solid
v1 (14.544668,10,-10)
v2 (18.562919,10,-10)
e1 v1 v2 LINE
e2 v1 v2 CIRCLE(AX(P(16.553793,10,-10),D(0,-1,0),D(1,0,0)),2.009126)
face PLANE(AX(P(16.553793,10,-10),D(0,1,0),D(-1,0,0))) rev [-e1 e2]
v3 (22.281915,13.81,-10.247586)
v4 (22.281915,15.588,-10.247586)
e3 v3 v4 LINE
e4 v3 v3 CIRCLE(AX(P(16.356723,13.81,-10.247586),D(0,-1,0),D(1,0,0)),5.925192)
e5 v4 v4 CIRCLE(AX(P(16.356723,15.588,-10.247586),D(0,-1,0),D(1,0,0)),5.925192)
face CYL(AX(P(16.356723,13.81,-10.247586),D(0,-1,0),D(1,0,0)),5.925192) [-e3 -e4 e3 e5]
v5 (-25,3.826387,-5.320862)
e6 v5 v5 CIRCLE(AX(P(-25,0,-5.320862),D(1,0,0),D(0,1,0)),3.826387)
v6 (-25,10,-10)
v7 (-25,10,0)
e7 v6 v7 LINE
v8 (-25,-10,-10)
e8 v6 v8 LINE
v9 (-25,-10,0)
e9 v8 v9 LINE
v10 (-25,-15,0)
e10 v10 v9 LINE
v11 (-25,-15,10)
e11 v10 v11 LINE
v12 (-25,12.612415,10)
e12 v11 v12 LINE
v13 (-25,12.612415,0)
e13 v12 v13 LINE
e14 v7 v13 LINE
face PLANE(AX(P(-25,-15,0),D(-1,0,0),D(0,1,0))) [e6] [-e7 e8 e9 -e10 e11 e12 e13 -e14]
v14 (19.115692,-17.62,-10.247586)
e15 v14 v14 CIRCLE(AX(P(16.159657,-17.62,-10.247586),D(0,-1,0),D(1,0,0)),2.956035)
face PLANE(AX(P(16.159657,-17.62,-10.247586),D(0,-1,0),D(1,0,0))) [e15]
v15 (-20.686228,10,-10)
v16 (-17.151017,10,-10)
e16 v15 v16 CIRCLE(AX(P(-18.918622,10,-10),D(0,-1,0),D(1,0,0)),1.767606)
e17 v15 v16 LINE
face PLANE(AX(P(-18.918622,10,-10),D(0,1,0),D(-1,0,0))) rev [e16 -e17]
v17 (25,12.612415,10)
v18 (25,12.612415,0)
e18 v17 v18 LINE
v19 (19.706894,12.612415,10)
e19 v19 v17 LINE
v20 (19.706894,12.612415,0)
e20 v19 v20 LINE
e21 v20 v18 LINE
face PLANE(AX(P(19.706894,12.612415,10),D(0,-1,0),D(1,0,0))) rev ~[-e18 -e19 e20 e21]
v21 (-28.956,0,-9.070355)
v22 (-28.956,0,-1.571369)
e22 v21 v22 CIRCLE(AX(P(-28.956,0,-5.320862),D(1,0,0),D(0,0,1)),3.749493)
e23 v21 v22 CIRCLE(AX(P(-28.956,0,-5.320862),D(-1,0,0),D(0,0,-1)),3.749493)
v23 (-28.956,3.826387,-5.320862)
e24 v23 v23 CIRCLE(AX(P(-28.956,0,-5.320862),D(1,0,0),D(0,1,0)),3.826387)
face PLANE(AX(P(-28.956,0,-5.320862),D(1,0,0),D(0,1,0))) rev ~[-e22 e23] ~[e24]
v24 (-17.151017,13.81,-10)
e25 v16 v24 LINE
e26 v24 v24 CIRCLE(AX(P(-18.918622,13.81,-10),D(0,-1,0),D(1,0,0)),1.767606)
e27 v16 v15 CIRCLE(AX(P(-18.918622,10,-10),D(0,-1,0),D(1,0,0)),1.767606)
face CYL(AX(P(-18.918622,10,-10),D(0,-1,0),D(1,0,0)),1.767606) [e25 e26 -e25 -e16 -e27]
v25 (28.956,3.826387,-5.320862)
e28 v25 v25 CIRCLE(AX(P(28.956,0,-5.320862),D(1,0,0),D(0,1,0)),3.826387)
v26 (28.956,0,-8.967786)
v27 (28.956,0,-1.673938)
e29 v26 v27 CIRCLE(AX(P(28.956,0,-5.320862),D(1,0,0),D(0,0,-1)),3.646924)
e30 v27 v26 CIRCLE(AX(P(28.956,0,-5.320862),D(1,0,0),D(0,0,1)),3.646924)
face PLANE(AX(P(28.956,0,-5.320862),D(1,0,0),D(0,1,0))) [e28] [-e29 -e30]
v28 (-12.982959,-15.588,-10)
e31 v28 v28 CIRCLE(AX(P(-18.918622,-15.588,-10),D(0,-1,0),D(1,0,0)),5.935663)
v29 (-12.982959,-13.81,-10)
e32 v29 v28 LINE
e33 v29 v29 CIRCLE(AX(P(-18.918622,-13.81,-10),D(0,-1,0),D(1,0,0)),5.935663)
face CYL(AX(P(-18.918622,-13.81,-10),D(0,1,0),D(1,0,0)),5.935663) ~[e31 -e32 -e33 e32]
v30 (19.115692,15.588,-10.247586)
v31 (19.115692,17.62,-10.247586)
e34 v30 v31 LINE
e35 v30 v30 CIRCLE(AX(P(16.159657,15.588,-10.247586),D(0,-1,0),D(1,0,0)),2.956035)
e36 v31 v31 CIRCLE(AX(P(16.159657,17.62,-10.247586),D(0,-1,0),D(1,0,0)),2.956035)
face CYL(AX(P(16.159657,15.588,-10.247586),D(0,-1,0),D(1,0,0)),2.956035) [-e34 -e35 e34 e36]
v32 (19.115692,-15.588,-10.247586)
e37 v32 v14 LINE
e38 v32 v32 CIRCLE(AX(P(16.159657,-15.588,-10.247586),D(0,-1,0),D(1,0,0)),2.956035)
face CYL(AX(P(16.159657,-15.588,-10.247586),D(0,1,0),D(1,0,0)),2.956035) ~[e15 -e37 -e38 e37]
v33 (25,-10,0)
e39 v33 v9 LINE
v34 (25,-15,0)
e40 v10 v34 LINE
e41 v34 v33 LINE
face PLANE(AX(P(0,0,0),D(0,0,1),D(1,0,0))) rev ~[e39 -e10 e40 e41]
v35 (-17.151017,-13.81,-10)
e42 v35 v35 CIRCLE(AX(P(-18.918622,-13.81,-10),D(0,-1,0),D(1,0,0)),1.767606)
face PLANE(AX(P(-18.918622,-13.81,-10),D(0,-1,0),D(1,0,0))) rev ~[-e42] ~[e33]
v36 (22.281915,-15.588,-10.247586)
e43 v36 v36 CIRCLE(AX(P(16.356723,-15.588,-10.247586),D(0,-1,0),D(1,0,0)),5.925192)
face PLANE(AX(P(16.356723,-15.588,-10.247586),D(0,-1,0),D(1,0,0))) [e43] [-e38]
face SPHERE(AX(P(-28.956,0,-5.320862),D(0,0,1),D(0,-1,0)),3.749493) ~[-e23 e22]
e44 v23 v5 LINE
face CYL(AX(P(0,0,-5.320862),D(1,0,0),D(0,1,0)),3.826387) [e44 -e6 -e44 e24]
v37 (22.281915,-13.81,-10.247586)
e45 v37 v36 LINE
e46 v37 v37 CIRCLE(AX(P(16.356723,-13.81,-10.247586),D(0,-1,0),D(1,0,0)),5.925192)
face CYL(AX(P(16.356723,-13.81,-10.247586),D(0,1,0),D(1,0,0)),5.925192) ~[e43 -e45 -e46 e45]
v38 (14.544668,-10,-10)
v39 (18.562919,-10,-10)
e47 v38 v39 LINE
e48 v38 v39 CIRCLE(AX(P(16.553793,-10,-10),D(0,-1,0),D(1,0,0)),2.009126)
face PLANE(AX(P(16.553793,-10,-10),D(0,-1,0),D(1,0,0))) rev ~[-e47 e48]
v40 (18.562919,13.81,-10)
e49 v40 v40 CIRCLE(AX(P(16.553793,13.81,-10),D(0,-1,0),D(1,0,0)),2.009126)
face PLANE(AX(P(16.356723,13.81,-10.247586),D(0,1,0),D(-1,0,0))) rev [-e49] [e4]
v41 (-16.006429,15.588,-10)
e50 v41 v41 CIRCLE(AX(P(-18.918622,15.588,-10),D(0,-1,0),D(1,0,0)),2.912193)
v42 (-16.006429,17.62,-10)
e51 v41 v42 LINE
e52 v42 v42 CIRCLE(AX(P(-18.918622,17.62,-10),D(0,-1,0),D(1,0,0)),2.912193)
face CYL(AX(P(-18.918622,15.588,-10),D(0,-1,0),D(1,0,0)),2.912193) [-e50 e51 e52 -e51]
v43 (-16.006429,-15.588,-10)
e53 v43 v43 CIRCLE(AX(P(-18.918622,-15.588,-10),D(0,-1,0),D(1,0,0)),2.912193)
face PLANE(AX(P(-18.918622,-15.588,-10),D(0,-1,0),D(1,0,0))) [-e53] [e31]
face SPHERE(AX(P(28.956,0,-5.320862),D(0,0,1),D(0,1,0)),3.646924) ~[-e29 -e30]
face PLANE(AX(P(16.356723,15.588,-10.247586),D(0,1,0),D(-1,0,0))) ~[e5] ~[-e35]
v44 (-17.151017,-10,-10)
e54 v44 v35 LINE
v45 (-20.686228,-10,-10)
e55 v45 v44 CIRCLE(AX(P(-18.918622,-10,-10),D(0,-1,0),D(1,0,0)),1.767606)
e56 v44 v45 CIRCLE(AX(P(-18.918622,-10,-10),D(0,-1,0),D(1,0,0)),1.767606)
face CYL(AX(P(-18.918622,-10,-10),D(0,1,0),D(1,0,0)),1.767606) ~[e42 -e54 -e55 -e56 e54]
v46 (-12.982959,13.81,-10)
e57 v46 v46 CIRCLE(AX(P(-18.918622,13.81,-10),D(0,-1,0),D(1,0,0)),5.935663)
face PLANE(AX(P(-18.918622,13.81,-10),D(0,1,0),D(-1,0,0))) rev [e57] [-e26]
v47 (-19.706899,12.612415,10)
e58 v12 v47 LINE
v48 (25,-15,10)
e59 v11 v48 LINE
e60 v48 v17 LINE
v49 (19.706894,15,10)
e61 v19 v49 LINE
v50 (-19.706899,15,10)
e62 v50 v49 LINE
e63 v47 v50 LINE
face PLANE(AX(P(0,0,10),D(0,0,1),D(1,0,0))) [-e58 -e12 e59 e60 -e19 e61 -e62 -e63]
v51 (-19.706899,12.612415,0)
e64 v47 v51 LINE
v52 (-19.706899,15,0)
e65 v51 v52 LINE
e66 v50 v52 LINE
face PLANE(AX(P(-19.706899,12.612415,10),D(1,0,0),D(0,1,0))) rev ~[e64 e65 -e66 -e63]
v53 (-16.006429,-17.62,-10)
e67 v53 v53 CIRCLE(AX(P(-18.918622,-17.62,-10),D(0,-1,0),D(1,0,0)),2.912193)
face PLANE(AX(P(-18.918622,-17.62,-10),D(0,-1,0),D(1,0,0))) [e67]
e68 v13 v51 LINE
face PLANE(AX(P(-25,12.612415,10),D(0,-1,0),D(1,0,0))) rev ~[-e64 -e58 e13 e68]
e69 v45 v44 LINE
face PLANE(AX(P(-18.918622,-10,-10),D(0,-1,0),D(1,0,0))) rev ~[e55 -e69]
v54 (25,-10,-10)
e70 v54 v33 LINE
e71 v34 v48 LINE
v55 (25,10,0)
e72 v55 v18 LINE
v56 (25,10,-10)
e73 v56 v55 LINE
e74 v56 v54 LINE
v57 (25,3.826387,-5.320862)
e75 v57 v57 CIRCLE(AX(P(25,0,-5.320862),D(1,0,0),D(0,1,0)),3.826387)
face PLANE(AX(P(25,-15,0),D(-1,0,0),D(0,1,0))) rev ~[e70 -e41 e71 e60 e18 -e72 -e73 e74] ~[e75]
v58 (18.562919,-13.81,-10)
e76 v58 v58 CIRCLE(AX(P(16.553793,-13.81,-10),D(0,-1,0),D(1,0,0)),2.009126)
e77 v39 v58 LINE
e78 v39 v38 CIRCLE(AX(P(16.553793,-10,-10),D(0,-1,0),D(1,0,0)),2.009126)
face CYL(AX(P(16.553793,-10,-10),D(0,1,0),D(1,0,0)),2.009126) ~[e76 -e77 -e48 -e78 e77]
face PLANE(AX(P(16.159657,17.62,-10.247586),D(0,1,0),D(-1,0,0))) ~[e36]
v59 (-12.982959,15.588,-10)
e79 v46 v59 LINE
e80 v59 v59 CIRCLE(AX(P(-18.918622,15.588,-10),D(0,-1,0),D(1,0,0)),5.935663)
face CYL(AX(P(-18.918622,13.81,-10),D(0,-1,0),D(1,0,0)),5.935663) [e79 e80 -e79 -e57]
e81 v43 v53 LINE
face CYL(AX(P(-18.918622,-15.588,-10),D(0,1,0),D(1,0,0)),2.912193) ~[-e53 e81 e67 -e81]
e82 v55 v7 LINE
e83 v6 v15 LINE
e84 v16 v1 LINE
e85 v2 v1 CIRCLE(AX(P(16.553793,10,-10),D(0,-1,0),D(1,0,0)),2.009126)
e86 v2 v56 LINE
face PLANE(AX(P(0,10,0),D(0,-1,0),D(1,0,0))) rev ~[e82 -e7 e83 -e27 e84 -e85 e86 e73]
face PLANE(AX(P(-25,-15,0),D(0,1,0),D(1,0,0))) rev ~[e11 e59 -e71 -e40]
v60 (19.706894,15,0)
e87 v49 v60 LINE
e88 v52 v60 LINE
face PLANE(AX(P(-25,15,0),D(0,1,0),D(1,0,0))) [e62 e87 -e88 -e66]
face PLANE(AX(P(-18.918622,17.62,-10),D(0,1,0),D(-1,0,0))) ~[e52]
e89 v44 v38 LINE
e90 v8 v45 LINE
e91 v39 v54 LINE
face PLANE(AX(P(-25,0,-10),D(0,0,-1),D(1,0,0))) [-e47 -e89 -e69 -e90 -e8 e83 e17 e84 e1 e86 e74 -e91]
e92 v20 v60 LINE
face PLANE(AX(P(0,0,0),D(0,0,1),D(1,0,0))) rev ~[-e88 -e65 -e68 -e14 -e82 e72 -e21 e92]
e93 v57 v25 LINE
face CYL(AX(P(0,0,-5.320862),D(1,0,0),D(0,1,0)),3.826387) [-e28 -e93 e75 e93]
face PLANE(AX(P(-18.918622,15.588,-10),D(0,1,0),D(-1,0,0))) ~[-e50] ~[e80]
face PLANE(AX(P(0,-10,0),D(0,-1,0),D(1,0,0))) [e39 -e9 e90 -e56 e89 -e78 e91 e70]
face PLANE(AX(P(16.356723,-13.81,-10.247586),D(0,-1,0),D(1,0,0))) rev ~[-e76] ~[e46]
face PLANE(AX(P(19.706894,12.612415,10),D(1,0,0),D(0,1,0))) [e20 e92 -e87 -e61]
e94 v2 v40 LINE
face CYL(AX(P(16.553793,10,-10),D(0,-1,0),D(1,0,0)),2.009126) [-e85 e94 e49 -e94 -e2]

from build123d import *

# Parameters (mm, degrees)
F0_W      = 50
F0_H      = 20
F1_DEPTH  = 10
F2_W      = 50
F2_H      = 30
F3_DEPTH  = 10
F4_R      = 3.8263869055
F5_DEPTH  = 28.956
F10_W     = 5.2931006998
F10_H     = 2.3875854537
F10_W_2   = 5.2931062877
F11_DEPTH = 20.001
F12_R     = 1.7676057038
F12_R_2   = 2.0091255021
F13_DEPTH = 3.81
F14_R     = 5.9356630849
F14_R_2   = 5.9251919842
F15_DEPTH = 1.778
F16_R     = 2.9121930079
F16_R_2   = 2.9560346156
F17_DEPTH = 2.032


# Not quite as in the source:
# - a pattern or mirror of a feature is missing from the dataset's text; its kind, count and spacing are read off the source's solid


with BuildPart() as f1:
    # F0 (on Front) → F1 (new body, symmetric)
    with BuildSketch(Plane.XZ):
        Rectangle(F0_W, F0_H)
    extrude(amount=F1_DEPTH, both=True)

    # F2 (on Top) → F3 (join)
    with BuildSketch(Plane.XY):
        Rectangle(F2_W, F2_H)
    extrude(amount=F3_DEPTH)

    # F4 (on Right) → F5 (join, symmetric)
    with BuildSketch(Plane.YZ):
        with Locations((0, -5.3208619356)):
            Circle(F4_R)
    extrude(amount=F5_DEPTH, both=True)

    # F6 (on face) → F7 (revolve)
    with BuildSketch(Plane(origin=(-28.956, 0, 0), x_dir=(0, -1, 0), z_dir=(-1, 0, 0))):
        with BuildLine():
            Line((0, -1.5713692232), (0, -9.0703546481))
            ThreePointArc((0, -9.0703546481), (3.7494927125, -5.3208619356), (0, -1.5713692232))
        make_face()
    revolve(axis=Axis((-28.956, 0, -5.2824148391), (0, 0, -1)))

    # F8 (on face) → F9 (revolve)
    with BuildSketch(Plane.YZ.offset(28.956)):
        with BuildLine():
            Line((0, -1.6739376972), (0, -8.967786174))
            ThreePointArc((0, -8.967786174), (3.6469242384, -5.3208619356), (0, -1.6739376972))
        make_face()
    revolve(axis=Axis((28.956, 0, -5.3208619356), (0, 0, -1)))

    # F10 (on face) → F11 (cut, through all)
    with BuildSketch(Plane.XY.offset(10)):
        with Locations((-22.3534496501, 13.8062072732)):
            Rectangle(F10_W, F10_H)
        with Locations((22.3534468561, 13.8062072732)):
            Rectangle(F10_W_2, F10_H)
    extrude(amount=-F11_DEPTH, mode=Mode.SUBTRACT)

    # F12 (on face) → F13 (join)
    with BuildSketch(Plane.XZ.offset(10)):
        with Locations((-18.9186222851, -10)):
            Circle(F12_R)
        with Locations((16.5537931025, -10)):
            Circle(F12_R_2)
    f13 = extrude(amount=F13_DEPTH)

    # F13_copies: F13 across plane
    add(f13.mirror(Plane.ZX))

    # F14 (on face) → F15 (join)
    with BuildSketch(Plane.XZ.offset(13.81)):
        with Locations((-18.9186222851, -10)):
            Circle(F14_R)
        with Locations((16.3567233831, -10.247586295)):
            Circle(F14_R_2)
    f15 = extrude(amount=F15_DEPTH)

    # F15_copies: F15 across plane
    add(f15.mirror(Plane.ZX))

    # F16 (on face) → F17 (join)
    with BuildSketch(Plane.XZ.offset(15.588)):
        with Locations((-18.9186222851, -10)):
            Circle(F16_R)
        with Locations((16.1596573889, -10.247586295)):
            Circle(F16_R_2)
    f17 = extrude(amount=F17_DEPTH)

    # F17_copies: F17 across plane
    add(f17.mirror(Plane.ZX))


solid = f1.part
